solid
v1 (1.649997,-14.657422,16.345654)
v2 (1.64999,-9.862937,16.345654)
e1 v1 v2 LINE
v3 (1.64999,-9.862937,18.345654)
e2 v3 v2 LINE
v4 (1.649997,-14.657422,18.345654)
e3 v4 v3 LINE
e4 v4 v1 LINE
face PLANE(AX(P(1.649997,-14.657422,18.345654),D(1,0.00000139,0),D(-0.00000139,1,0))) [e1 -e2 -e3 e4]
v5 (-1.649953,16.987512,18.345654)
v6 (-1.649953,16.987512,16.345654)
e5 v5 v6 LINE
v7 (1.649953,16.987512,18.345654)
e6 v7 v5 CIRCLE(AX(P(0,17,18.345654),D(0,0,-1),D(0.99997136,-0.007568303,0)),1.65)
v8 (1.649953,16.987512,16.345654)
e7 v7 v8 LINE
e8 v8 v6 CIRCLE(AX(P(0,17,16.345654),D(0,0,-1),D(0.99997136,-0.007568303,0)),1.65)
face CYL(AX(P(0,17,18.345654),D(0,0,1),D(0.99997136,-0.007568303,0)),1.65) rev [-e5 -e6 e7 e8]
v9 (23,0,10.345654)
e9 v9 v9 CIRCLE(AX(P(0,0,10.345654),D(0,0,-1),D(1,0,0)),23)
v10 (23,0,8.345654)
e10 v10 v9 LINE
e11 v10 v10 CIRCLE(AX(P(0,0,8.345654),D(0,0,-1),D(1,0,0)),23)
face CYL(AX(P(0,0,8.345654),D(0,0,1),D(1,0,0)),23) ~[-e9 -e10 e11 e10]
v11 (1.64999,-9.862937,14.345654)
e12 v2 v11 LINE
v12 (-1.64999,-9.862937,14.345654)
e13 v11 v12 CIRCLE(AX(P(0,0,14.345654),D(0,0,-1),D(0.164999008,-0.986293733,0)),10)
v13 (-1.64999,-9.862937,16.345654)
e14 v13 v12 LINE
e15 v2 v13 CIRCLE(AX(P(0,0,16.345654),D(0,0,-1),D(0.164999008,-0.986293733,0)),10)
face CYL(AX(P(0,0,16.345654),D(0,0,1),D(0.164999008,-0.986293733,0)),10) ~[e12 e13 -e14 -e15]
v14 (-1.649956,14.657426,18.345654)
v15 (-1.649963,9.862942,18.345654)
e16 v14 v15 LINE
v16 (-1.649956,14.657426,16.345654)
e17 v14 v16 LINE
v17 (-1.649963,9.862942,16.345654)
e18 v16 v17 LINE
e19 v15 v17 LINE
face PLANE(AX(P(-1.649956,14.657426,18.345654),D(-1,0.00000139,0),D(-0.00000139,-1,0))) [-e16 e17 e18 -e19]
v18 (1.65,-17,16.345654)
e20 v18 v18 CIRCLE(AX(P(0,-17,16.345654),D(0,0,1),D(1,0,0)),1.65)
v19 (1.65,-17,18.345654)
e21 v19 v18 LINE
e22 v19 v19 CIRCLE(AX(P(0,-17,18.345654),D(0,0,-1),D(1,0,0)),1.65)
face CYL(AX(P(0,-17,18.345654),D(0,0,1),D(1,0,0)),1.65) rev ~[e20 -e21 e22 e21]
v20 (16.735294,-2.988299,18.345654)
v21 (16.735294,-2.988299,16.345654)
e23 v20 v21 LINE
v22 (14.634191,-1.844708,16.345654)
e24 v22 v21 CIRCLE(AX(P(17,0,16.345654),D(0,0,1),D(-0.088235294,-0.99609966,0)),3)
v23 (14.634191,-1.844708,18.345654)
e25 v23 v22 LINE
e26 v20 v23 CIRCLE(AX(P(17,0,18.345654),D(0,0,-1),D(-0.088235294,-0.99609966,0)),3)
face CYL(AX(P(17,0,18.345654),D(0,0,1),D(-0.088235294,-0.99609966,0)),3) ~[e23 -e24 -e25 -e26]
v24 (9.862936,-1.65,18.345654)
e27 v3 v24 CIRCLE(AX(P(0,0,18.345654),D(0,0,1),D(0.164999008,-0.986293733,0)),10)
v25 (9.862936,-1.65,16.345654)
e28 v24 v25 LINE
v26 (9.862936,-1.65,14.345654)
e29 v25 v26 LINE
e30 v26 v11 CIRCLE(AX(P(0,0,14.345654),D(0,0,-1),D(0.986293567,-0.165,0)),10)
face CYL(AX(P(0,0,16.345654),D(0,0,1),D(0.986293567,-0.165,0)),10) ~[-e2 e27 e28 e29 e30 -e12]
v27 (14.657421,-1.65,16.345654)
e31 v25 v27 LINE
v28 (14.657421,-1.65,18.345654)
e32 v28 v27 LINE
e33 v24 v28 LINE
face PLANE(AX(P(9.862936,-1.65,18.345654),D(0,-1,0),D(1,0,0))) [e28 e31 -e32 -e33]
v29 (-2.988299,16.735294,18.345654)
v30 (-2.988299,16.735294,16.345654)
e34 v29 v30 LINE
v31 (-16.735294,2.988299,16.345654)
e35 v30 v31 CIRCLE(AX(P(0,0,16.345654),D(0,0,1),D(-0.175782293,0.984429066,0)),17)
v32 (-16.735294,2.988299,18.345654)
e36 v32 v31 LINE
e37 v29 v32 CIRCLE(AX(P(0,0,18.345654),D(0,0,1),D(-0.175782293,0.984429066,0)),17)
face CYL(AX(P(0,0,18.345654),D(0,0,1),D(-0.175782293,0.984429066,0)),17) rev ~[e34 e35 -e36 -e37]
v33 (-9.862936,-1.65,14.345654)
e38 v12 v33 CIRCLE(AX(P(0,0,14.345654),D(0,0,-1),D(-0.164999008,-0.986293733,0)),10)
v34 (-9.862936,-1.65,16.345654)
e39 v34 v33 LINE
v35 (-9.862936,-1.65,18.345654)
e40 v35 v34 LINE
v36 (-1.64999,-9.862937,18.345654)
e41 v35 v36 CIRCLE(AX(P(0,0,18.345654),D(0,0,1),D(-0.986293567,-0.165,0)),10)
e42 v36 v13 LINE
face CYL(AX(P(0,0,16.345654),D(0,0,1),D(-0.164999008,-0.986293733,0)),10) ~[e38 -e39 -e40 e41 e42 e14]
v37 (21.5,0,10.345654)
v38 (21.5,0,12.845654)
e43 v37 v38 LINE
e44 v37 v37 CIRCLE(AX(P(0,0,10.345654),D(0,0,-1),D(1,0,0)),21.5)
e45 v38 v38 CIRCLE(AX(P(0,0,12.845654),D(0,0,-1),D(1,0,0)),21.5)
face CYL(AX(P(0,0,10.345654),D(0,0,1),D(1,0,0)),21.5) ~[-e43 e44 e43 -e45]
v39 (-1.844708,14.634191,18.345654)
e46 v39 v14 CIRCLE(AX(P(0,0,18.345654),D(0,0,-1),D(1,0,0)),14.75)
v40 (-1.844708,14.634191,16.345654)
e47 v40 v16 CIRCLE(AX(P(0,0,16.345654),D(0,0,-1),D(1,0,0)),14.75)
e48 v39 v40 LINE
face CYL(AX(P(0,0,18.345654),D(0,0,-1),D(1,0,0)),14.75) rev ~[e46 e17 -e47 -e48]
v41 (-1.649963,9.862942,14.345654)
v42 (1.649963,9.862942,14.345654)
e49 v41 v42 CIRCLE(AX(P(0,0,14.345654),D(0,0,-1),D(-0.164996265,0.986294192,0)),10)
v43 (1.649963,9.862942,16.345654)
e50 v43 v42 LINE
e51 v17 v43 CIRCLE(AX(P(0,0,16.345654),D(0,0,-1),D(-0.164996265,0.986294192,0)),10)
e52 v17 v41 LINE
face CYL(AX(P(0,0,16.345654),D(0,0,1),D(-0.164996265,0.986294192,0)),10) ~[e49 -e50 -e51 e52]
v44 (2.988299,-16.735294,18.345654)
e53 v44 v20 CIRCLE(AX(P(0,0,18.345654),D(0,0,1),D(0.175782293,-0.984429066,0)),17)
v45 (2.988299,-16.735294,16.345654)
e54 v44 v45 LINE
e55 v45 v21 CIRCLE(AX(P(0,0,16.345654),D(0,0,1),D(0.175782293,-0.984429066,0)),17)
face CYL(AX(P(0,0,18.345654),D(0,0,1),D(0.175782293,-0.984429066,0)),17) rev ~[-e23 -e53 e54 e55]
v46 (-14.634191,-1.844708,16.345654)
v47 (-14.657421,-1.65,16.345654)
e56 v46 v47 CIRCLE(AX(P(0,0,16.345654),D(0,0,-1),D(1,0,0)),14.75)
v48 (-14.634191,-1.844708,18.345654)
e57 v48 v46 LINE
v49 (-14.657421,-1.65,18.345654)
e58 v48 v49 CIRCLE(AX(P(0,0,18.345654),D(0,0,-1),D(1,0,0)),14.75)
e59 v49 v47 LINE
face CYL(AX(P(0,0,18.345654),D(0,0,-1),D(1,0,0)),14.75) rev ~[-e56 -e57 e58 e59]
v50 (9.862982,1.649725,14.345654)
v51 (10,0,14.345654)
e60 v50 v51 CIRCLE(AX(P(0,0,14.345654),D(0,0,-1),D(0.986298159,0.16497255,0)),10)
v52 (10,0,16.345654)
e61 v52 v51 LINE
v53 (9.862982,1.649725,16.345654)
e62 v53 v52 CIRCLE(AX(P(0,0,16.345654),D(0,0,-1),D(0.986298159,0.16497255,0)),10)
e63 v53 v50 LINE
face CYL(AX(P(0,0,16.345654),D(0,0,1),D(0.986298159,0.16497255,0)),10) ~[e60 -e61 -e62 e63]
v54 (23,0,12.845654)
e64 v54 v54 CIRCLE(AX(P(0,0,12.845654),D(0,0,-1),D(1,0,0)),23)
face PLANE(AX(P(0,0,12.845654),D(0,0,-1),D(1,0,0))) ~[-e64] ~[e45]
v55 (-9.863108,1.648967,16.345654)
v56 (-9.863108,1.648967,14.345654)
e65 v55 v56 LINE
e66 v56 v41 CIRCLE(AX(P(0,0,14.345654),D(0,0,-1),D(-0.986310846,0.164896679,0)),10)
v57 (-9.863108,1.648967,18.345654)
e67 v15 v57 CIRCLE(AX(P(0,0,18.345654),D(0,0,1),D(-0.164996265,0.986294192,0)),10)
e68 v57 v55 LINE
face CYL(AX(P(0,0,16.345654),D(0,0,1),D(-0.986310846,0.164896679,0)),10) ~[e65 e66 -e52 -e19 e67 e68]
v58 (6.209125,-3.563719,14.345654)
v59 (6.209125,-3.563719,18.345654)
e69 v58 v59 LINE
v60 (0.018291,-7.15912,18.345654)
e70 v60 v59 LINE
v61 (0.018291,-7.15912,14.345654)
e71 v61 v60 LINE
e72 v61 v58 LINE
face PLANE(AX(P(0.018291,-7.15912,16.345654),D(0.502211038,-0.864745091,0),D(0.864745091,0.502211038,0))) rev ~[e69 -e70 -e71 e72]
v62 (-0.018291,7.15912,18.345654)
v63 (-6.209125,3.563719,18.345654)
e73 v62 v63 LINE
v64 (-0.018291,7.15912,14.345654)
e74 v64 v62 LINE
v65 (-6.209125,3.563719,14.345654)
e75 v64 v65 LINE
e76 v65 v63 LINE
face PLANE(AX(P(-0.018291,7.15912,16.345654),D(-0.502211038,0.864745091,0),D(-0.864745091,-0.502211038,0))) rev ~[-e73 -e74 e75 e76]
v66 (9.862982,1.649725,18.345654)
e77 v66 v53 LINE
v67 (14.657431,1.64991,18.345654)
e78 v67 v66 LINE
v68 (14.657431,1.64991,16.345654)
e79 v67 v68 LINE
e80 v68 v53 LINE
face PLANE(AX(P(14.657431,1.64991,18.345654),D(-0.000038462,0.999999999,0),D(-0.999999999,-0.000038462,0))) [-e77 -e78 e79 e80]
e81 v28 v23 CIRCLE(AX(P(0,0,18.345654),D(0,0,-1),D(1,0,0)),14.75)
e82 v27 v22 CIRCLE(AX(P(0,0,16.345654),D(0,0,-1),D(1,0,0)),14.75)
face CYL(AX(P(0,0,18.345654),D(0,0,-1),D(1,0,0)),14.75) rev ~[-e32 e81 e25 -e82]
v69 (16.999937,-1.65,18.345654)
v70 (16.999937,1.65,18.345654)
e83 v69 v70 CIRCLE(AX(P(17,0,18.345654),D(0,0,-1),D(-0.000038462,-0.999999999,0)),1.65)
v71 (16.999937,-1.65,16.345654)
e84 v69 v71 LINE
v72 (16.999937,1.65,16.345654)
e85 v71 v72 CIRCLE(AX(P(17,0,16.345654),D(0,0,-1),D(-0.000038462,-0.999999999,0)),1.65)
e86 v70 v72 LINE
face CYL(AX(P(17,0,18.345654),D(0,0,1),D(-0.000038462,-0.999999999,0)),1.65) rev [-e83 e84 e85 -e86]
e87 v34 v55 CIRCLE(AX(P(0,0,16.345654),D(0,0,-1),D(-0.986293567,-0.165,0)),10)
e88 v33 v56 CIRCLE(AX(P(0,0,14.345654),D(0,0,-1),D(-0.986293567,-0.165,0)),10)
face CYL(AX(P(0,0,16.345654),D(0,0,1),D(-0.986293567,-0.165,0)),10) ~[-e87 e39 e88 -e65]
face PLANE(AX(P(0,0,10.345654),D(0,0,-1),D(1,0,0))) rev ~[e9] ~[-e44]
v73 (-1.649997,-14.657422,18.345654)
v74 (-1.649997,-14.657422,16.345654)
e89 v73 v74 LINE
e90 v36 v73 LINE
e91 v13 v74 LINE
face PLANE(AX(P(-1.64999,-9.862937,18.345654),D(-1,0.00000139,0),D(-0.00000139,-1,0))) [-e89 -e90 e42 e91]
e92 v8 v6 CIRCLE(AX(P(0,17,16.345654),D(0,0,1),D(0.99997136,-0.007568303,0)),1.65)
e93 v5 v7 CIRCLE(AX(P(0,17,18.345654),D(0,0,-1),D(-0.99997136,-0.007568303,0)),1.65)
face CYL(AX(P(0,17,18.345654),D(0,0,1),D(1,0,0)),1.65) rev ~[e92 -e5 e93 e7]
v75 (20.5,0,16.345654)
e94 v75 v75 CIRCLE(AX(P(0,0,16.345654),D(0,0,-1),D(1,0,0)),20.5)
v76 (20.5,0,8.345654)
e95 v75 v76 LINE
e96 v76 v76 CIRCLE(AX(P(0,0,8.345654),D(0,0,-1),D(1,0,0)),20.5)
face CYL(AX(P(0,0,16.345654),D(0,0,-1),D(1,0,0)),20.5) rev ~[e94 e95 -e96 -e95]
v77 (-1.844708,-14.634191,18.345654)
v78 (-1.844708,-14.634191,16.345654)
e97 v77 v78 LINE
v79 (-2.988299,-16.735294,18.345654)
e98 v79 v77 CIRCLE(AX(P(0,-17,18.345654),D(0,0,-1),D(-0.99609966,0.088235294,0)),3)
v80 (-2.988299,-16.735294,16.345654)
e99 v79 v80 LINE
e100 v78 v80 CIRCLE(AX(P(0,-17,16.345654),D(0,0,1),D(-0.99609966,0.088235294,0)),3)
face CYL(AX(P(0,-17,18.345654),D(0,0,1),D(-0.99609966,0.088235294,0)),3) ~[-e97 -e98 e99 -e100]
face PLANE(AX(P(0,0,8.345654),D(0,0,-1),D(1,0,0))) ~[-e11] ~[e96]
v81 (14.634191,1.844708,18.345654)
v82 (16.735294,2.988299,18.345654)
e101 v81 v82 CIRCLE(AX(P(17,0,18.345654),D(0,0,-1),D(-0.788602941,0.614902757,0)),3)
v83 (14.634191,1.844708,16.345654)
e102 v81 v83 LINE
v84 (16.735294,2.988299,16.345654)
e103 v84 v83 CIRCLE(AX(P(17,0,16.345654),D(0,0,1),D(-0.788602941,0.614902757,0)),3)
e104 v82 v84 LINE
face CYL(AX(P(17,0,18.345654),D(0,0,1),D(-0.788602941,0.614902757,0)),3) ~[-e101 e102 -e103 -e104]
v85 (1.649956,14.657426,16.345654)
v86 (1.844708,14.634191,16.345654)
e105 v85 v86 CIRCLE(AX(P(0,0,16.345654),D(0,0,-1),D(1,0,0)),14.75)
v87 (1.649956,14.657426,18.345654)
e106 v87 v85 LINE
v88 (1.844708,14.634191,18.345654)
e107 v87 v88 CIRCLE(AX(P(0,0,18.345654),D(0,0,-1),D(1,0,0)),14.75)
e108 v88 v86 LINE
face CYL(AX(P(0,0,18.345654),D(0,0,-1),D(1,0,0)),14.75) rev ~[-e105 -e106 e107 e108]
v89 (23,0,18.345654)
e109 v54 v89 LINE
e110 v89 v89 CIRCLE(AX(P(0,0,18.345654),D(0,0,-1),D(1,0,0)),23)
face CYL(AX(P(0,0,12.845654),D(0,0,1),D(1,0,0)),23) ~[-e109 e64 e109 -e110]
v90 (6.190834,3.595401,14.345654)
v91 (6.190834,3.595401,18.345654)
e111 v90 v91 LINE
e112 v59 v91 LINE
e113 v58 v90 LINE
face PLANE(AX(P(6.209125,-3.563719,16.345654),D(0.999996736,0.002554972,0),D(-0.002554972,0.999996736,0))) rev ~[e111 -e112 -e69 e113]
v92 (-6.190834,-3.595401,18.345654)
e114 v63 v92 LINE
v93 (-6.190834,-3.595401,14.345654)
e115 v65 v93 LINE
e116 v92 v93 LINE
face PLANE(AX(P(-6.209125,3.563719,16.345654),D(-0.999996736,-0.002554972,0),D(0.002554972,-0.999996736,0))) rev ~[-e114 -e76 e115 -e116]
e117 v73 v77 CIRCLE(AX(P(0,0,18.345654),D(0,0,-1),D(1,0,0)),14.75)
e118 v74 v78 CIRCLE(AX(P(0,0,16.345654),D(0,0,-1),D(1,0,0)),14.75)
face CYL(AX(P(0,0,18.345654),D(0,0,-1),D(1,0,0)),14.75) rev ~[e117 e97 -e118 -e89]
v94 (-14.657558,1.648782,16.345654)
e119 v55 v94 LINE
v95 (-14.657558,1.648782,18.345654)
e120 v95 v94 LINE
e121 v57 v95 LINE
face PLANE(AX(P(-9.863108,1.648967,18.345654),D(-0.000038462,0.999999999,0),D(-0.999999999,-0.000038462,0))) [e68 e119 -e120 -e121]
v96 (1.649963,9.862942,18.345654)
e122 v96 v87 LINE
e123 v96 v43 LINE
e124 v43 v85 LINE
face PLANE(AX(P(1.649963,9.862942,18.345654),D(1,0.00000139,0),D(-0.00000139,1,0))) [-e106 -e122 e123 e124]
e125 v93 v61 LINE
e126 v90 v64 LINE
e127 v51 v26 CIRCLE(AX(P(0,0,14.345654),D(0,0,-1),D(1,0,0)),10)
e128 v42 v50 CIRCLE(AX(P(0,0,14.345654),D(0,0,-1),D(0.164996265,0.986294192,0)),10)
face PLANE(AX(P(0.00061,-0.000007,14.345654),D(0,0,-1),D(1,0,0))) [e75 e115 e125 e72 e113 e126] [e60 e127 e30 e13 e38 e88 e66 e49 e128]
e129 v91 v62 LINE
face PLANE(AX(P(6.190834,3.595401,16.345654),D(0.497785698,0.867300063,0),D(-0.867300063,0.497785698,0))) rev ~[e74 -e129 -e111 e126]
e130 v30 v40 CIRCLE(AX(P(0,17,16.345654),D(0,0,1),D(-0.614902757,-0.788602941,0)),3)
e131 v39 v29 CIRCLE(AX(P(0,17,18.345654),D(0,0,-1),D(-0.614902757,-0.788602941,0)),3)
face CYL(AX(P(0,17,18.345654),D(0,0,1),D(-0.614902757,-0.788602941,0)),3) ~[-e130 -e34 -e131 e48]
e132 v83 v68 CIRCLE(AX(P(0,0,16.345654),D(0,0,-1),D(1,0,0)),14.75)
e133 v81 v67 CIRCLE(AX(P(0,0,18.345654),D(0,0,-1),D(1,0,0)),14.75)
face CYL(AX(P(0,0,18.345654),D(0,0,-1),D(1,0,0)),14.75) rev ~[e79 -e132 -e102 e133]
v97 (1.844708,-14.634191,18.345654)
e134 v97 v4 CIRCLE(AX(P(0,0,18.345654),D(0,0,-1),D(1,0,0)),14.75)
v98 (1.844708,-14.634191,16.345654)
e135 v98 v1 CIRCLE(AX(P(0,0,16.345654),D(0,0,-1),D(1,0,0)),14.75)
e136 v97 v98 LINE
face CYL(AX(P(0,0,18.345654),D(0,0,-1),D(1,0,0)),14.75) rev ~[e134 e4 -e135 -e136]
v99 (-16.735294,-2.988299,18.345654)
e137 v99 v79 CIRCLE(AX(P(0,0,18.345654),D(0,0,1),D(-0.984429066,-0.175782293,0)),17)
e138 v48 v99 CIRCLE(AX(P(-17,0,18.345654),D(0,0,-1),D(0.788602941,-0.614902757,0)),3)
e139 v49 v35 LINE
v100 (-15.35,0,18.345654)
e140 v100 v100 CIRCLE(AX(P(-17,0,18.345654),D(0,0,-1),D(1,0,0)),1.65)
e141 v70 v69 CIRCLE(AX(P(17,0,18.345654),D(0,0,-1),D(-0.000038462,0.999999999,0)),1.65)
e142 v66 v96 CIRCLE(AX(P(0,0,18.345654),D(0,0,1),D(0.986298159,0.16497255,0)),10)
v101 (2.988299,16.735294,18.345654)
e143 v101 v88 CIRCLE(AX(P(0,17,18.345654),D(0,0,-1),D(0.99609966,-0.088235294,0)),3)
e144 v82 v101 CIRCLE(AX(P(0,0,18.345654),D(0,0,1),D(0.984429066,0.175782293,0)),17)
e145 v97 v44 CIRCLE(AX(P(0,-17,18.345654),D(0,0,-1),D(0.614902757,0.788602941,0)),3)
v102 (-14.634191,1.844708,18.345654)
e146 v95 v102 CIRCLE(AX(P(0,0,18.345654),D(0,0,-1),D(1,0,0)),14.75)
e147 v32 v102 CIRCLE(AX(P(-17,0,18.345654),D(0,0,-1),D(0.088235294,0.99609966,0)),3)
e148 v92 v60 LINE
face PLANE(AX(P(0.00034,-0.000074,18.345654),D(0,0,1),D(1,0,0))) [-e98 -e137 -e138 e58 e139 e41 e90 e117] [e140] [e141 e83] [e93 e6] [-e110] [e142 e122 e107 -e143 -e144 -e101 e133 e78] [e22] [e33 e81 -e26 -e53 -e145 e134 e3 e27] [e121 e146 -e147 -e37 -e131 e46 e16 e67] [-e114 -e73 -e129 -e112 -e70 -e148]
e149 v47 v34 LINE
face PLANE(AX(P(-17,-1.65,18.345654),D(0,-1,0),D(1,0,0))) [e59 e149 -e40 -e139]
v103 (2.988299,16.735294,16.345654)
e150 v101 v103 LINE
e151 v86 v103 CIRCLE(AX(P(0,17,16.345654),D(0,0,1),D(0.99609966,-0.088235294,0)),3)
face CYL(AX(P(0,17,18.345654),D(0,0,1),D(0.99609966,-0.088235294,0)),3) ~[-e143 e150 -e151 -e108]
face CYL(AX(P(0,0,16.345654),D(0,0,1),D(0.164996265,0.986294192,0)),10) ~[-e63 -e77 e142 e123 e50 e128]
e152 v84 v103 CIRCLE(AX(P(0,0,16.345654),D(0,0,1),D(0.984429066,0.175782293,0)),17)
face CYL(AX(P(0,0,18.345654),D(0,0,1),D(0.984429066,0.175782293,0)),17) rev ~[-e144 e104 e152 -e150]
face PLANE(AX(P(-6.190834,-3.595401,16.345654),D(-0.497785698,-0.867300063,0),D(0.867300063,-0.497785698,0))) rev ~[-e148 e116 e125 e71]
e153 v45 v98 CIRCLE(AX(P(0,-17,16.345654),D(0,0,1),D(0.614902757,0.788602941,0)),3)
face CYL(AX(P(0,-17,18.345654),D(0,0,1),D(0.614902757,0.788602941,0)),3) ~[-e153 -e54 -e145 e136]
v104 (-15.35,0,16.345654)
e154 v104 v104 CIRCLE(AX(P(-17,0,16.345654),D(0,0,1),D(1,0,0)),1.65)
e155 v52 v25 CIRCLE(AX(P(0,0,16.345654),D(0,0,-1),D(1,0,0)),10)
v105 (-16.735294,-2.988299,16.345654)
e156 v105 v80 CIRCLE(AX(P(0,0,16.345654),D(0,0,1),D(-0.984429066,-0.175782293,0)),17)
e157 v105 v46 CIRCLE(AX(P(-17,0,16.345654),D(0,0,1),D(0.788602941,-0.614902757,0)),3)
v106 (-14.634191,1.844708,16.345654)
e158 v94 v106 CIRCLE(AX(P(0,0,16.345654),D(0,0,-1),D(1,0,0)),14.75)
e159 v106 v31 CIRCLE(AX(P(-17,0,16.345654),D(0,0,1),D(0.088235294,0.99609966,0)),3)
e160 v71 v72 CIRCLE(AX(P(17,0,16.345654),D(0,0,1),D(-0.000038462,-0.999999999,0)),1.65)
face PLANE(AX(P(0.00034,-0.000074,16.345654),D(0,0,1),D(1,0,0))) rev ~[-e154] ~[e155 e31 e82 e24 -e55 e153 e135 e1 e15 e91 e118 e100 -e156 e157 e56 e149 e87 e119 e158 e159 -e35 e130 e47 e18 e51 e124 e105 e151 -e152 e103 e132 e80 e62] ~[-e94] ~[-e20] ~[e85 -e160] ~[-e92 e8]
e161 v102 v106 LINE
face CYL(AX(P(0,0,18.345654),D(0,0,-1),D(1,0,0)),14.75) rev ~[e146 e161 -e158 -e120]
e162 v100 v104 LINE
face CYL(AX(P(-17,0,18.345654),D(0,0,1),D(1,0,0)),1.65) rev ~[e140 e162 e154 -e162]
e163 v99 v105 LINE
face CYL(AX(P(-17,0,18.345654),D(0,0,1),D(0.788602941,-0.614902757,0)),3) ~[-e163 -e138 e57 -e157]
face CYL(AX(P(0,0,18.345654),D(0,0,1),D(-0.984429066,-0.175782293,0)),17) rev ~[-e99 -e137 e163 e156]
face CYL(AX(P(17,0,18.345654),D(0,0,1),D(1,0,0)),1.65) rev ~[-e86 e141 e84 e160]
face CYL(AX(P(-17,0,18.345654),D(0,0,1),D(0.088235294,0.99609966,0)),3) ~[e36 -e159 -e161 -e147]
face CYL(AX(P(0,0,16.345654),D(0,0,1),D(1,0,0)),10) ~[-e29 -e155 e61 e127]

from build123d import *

# Parameters (mm, degrees)
F2_R     = 1.65
F3_DEPTH = 10.001
F5_DEPTH = 2
F7_DEPTH = 10.001
F9_DEPTH = 2


# Not quite as in the source:
# - ends of sketch curves that miss each other by under 0.0002 mm in the source are joined


with BuildPart() as f1:
    # F0 (on Front) → F1 (revolve)
    with BuildSketch(Plane.XZ):
        Polygon((20.5, 16.3456536829), (20.5, 8.3456536829), (23, 8.3456536829), (23, 10.3456536829), (21.5, 10.3456536829), (21.5, 12.8456536829), (23, 12.8456536829), (23, 18.3456536829), (14.75, 18.3456536829), (14.75, 16.3456536829), align=None)
    revolve(axis=Axis((0, 0, 17.3456536829), (0, 0, -1)))

    # F2 (on face) → F3 (cut, through all)
    with BuildSketch(Plane.XY.offset(18.3456536829)):
        with Locations((0, 17)):
            Circle(F2_R)
        with Locations((17, 0)):
            Circle(F2_R)
        with Locations((-17, 0)):
            Circle(F2_R)
        with Locations((0, -17)):
            Circle(F2_R)
    extrude(amount=-F3_DEPTH, mode=Mode.SUBTRACT)

    # F4 (on face) → F5 (join)
    with BuildSketch(Plane.XY.offset(18.3456536829)):
        with BuildLine():
            Line((-1.6499559837, 14.6574262833), (-1.6499626499, 9.8629419168))
            ThreePointArc((-1.6499626499, 9.8629419168), (-7.0714247823, 7.0707108234), (-9.8631084617, 1.6489667897))
            Line((-9.8631084617, 1.6489667897), (-14.6575583453, 1.6487823851))
            ThreePointArc((-14.6575583453, 1.6487823851), (-14.7499999873, -0.0006126499), (-14.6574213285, -1.6499999999))
            Line((-14.6574213285, -1.6499999999), (-9.8629356685, -1.6499999997))
            ThreePointArc((-9.8629356685, -1.6499999997), (-7.0710642548, -7.071071369), (-1.6499900767, -9.8629373285))
            Line((-1.6499900767, -9.8629373285), (-1.6499967429, -14.6574216951))
            ThreePointArc((-1.6499967429, -14.6574216951), (0, -14.75), (1.6499967429, -14.6574216951))
            Line((1.6499967429, -14.6574216951), (1.6499900767, -9.8629373285))
            ThreePointArc((1.6499900767, -9.8629373285), (7.071064255, -7.0710713687), (9.8629356686, -1.649999999))
            Line((9.8629356686, -1.649999999), (14.6574213286, -1.6499999989))
            ThreePointArc((14.6574213286, -1.6499999989), (14.7268371451, -0.8262975866), (14.75, 0))
            ThreePointArc((14.75, 0), (14.7268396846, 0.8262523244), (14.6574314707, 1.6499099011))
            Line((14.6574314707, 1.6499099011), (9.862981587, 1.6497254965))
            ThreePointArc((9.862981587, 1.6497254965), (7.0711528227, 7.0709828), (1.6499626499, 9.8629419168))
            Line((1.6499626499, 9.8629419168), (1.6499559837, 14.6574262833))
            ThreePointArc((1.6499559837, 14.6574262833), (0, 14.75), (-1.6499559837, 14.6574262833))
        make_face()
        with BuildLine():
            Line((-1.649952744, 16.9875123006), (-1.6499559837, 14.6574262833))
            ThreePointArc((-1.6499559837, 14.6574262833), (0, 14.75), (1.6499559837, 14.6574262833))
            Line((1.6499559837, 14.6574262833), (1.649952744, 16.9875123006))
            ThreePointArc((1.649952744, 16.9875123006), (0, 15.35), (-1.649952744, 16.9875123006))
        make_face()
        with BuildLine():
            Line((16.9999365375, 1.6499999988), (14.6574314707, 1.6499099011))
            ThreePointArc((14.6574314707, 1.6499099011), (14.7268396846, 0.8262523244), (14.75, 0))
            ThreePointArc((14.75, 0), (14.7268371451, -0.8262975866), (14.6574213286, -1.6499999989))
            Line((14.6574213286, -1.6499999989), (16.9999365375, -1.6499999988))
            ThreePointArc((16.9999365375, -1.6499999988), (15.35, 0), (16.9999365375, 1.6499999988))
        make_face()
        with BuildLine():
            ThreePointArc((-14.6574213285, -1.6499999999), (-14.7499999873, -0.0006126499), (-14.6575583453, 1.6487823851))
            Line((-14.6575583453, 1.6487823851), (-16.9343843655, 1.6486948136))
            ThreePointArc((-16.9343843655, 1.6486948136), (-15.8103013413, 1.1432922205), (-15.35, 0))
            ThreePointArc((-15.35, 0), (-15.833273811, -1.166726189), (-17, -1.65))
            Line((-17, -1.65), (-14.6574213285, -1.6499999999))
        make_face()
        with BuildLine():
            ThreePointArc((1.6499967429, -14.6574216951), (0, -14.75), (-1.6499967429, -14.6574216951))
            Line((-1.6499967429, -14.6574216951), (-1.65, -16.9999977059))
            ThreePointArc((-1.65, -16.9999977059), (1.1471e-06, -15.35), (1.65, -17))
            Line((1.65, -17), (1.6499967429, -14.6574216951))
        make_face()
    extrude(amount=-F5_DEPTH)

    # F6 (on face) → F7 (cut, through all)
    with BuildSketch(Plane.XY.offset(18.3456536829)):
        with BuildLine():
            ThreePointArc((-1.8447082725, 14.6341911765), (-2.634985421, 15.5658271264), (-2.9882989803, 16.7352941176))
            ThreePointArc((-2.9882989803, 16.7352941176), (-12.0208152802, 12.0208152802), (-16.7352941176, 2.9882989803))
            ThreePointArc((-16.7352941176, 2.9882989803), (-15.5658271264, 2.634985421), (-14.6341911765, 1.8447082725))
            ThreePointArc((-14.6341911765, 1.8447082725), (-10.4298250225, 10.4298250225), (-1.8447082725, 14.6341911765))
        make_face()
        with BuildLine():
            ThreePointArc((2.9882989803, 16.7352941176), (2.634985421, 15.5658271264), (1.8447082725, 14.6341911765))
            ThreePointArc((1.8447082725, 14.6341911765), (10.4298250225, 10.4298250225), (14.6341911765, 1.8447082725))
            ThreePointArc((14.6341911765, 1.8447082725), (15.5658271264, 2.634985421), (16.7352941176, 2.9882989803))
            ThreePointArc((16.7352941176, 2.9882989803), (12.0208152802, 12.0208152802), (2.9882989803, 16.7352941176))
        make_face()
        with BuildLine():
            ThreePointArc((16.7352941176, -2.9882989803), (15.5658271264, -2.634985421), (14.6341911765, -1.8447082725))
            ThreePointArc((14.6341911765, -1.8447082725), (10.4298250225, -10.4298250225), (1.8447082725, -14.6341911765))
            ThreePointArc((1.8447082725, -14.6341911765), (2.634985421, -15.5658271264), (2.9882989803, -16.7352941176))
            ThreePointArc((2.9882989803, -16.7352941176), (12.0208152802, -12.0208152802), (16.7352941176, -2.9882989803))
        make_face()
        with BuildLine():
            ThreePointArc((-1.8447082725, -14.6341911765), (-10.4298250225, -10.4298250225), (-14.6341911765, -1.8447082725))
            ThreePointArc((-14.6341911765, -1.8447082725), (-15.5658271264, -2.634985421), (-16.7352941176, -2.9882989803))
            ThreePointArc((-16.7352941176, -2.9882989803), (-12.0208152802, -12.0208152802), (-2.9882989803, -16.7352941176))
            ThreePointArc((-2.9882989803, -16.7352941176), (-2.634985421, -15.5658271264), (-1.8447082725, -14.6341911765))
        make_face()
        Polygon((0.0182914075, -7.1591199709), (6.2091254673, -3.5637191619), (6.1908340598, 3.595400809), (-0.0182914075, 7.1591199709), (-6.2091254673, 3.5637191619), (-6.1908340598, -3.595400809), align=None)
    extrude(amount=-F7_DEPTH, mode=Mode.SUBTRACT)

    # F8 (on face) → F9 (join)
    with BuildSketch(Plane(origin=(0, 0, 16.3456536829), x_dir=(1, 0, 0), z_dir=(0, 0, -1))):
        with BuildLine():
            ThreePointArc((9.862981587, -1.6497254965), (9.965686526, -0.8277028844), (10, 0))
            ThreePointArc((10, 0), (9.9656750069, 0.8278415651), (9.8629356686, 1.649999999))
            ThreePointArc((9.8629356686, 1.649999999), (7.071064255, 7.0710713687), (1.6499900767, 9.8629373285))
            ThreePointArc((1.6499900767, 9.8629373285), (0, 10), (-1.6499900767, 9.8629373285))
            ThreePointArc((-1.6499900767, 9.8629373285), (-7.0710642548, 7.071071369), (-9.8629356685, 1.6499999997))
            ThreePointArc((-9.8629356685, 1.6499999997), (-9.9999999863, 0.0005237796), (-9.8631084617, -1.6489667897))
            ThreePointArc((-9.8631084617, -1.6489667897), (-7.0714247823, -7.0707108234), (-1.6499626499, -9.8629419168))
            ThreePointArc((-1.6499626499, -9.8629419168), (0, -10), (1.6499626499, -9.8629419168))
            ThreePointArc((1.6499626499, -9.8629419168), (7.0711528227, -7.0709828), (9.862981587, -1.6497254965))
        make_face()
        Polygon((-6.1908340598, 3.595400809), (0.0182914075, 7.1591199709), (6.2091254673, 3.5637191619), (6.1908340598, -3.595400809), (-0.0182914075, -7.1591199709), (-6.2091254673, -3.5637191619), align=None, mode=Mode.SUBTRACT)
    extrude(amount=F9_DEPTH)


solid = f1.part
